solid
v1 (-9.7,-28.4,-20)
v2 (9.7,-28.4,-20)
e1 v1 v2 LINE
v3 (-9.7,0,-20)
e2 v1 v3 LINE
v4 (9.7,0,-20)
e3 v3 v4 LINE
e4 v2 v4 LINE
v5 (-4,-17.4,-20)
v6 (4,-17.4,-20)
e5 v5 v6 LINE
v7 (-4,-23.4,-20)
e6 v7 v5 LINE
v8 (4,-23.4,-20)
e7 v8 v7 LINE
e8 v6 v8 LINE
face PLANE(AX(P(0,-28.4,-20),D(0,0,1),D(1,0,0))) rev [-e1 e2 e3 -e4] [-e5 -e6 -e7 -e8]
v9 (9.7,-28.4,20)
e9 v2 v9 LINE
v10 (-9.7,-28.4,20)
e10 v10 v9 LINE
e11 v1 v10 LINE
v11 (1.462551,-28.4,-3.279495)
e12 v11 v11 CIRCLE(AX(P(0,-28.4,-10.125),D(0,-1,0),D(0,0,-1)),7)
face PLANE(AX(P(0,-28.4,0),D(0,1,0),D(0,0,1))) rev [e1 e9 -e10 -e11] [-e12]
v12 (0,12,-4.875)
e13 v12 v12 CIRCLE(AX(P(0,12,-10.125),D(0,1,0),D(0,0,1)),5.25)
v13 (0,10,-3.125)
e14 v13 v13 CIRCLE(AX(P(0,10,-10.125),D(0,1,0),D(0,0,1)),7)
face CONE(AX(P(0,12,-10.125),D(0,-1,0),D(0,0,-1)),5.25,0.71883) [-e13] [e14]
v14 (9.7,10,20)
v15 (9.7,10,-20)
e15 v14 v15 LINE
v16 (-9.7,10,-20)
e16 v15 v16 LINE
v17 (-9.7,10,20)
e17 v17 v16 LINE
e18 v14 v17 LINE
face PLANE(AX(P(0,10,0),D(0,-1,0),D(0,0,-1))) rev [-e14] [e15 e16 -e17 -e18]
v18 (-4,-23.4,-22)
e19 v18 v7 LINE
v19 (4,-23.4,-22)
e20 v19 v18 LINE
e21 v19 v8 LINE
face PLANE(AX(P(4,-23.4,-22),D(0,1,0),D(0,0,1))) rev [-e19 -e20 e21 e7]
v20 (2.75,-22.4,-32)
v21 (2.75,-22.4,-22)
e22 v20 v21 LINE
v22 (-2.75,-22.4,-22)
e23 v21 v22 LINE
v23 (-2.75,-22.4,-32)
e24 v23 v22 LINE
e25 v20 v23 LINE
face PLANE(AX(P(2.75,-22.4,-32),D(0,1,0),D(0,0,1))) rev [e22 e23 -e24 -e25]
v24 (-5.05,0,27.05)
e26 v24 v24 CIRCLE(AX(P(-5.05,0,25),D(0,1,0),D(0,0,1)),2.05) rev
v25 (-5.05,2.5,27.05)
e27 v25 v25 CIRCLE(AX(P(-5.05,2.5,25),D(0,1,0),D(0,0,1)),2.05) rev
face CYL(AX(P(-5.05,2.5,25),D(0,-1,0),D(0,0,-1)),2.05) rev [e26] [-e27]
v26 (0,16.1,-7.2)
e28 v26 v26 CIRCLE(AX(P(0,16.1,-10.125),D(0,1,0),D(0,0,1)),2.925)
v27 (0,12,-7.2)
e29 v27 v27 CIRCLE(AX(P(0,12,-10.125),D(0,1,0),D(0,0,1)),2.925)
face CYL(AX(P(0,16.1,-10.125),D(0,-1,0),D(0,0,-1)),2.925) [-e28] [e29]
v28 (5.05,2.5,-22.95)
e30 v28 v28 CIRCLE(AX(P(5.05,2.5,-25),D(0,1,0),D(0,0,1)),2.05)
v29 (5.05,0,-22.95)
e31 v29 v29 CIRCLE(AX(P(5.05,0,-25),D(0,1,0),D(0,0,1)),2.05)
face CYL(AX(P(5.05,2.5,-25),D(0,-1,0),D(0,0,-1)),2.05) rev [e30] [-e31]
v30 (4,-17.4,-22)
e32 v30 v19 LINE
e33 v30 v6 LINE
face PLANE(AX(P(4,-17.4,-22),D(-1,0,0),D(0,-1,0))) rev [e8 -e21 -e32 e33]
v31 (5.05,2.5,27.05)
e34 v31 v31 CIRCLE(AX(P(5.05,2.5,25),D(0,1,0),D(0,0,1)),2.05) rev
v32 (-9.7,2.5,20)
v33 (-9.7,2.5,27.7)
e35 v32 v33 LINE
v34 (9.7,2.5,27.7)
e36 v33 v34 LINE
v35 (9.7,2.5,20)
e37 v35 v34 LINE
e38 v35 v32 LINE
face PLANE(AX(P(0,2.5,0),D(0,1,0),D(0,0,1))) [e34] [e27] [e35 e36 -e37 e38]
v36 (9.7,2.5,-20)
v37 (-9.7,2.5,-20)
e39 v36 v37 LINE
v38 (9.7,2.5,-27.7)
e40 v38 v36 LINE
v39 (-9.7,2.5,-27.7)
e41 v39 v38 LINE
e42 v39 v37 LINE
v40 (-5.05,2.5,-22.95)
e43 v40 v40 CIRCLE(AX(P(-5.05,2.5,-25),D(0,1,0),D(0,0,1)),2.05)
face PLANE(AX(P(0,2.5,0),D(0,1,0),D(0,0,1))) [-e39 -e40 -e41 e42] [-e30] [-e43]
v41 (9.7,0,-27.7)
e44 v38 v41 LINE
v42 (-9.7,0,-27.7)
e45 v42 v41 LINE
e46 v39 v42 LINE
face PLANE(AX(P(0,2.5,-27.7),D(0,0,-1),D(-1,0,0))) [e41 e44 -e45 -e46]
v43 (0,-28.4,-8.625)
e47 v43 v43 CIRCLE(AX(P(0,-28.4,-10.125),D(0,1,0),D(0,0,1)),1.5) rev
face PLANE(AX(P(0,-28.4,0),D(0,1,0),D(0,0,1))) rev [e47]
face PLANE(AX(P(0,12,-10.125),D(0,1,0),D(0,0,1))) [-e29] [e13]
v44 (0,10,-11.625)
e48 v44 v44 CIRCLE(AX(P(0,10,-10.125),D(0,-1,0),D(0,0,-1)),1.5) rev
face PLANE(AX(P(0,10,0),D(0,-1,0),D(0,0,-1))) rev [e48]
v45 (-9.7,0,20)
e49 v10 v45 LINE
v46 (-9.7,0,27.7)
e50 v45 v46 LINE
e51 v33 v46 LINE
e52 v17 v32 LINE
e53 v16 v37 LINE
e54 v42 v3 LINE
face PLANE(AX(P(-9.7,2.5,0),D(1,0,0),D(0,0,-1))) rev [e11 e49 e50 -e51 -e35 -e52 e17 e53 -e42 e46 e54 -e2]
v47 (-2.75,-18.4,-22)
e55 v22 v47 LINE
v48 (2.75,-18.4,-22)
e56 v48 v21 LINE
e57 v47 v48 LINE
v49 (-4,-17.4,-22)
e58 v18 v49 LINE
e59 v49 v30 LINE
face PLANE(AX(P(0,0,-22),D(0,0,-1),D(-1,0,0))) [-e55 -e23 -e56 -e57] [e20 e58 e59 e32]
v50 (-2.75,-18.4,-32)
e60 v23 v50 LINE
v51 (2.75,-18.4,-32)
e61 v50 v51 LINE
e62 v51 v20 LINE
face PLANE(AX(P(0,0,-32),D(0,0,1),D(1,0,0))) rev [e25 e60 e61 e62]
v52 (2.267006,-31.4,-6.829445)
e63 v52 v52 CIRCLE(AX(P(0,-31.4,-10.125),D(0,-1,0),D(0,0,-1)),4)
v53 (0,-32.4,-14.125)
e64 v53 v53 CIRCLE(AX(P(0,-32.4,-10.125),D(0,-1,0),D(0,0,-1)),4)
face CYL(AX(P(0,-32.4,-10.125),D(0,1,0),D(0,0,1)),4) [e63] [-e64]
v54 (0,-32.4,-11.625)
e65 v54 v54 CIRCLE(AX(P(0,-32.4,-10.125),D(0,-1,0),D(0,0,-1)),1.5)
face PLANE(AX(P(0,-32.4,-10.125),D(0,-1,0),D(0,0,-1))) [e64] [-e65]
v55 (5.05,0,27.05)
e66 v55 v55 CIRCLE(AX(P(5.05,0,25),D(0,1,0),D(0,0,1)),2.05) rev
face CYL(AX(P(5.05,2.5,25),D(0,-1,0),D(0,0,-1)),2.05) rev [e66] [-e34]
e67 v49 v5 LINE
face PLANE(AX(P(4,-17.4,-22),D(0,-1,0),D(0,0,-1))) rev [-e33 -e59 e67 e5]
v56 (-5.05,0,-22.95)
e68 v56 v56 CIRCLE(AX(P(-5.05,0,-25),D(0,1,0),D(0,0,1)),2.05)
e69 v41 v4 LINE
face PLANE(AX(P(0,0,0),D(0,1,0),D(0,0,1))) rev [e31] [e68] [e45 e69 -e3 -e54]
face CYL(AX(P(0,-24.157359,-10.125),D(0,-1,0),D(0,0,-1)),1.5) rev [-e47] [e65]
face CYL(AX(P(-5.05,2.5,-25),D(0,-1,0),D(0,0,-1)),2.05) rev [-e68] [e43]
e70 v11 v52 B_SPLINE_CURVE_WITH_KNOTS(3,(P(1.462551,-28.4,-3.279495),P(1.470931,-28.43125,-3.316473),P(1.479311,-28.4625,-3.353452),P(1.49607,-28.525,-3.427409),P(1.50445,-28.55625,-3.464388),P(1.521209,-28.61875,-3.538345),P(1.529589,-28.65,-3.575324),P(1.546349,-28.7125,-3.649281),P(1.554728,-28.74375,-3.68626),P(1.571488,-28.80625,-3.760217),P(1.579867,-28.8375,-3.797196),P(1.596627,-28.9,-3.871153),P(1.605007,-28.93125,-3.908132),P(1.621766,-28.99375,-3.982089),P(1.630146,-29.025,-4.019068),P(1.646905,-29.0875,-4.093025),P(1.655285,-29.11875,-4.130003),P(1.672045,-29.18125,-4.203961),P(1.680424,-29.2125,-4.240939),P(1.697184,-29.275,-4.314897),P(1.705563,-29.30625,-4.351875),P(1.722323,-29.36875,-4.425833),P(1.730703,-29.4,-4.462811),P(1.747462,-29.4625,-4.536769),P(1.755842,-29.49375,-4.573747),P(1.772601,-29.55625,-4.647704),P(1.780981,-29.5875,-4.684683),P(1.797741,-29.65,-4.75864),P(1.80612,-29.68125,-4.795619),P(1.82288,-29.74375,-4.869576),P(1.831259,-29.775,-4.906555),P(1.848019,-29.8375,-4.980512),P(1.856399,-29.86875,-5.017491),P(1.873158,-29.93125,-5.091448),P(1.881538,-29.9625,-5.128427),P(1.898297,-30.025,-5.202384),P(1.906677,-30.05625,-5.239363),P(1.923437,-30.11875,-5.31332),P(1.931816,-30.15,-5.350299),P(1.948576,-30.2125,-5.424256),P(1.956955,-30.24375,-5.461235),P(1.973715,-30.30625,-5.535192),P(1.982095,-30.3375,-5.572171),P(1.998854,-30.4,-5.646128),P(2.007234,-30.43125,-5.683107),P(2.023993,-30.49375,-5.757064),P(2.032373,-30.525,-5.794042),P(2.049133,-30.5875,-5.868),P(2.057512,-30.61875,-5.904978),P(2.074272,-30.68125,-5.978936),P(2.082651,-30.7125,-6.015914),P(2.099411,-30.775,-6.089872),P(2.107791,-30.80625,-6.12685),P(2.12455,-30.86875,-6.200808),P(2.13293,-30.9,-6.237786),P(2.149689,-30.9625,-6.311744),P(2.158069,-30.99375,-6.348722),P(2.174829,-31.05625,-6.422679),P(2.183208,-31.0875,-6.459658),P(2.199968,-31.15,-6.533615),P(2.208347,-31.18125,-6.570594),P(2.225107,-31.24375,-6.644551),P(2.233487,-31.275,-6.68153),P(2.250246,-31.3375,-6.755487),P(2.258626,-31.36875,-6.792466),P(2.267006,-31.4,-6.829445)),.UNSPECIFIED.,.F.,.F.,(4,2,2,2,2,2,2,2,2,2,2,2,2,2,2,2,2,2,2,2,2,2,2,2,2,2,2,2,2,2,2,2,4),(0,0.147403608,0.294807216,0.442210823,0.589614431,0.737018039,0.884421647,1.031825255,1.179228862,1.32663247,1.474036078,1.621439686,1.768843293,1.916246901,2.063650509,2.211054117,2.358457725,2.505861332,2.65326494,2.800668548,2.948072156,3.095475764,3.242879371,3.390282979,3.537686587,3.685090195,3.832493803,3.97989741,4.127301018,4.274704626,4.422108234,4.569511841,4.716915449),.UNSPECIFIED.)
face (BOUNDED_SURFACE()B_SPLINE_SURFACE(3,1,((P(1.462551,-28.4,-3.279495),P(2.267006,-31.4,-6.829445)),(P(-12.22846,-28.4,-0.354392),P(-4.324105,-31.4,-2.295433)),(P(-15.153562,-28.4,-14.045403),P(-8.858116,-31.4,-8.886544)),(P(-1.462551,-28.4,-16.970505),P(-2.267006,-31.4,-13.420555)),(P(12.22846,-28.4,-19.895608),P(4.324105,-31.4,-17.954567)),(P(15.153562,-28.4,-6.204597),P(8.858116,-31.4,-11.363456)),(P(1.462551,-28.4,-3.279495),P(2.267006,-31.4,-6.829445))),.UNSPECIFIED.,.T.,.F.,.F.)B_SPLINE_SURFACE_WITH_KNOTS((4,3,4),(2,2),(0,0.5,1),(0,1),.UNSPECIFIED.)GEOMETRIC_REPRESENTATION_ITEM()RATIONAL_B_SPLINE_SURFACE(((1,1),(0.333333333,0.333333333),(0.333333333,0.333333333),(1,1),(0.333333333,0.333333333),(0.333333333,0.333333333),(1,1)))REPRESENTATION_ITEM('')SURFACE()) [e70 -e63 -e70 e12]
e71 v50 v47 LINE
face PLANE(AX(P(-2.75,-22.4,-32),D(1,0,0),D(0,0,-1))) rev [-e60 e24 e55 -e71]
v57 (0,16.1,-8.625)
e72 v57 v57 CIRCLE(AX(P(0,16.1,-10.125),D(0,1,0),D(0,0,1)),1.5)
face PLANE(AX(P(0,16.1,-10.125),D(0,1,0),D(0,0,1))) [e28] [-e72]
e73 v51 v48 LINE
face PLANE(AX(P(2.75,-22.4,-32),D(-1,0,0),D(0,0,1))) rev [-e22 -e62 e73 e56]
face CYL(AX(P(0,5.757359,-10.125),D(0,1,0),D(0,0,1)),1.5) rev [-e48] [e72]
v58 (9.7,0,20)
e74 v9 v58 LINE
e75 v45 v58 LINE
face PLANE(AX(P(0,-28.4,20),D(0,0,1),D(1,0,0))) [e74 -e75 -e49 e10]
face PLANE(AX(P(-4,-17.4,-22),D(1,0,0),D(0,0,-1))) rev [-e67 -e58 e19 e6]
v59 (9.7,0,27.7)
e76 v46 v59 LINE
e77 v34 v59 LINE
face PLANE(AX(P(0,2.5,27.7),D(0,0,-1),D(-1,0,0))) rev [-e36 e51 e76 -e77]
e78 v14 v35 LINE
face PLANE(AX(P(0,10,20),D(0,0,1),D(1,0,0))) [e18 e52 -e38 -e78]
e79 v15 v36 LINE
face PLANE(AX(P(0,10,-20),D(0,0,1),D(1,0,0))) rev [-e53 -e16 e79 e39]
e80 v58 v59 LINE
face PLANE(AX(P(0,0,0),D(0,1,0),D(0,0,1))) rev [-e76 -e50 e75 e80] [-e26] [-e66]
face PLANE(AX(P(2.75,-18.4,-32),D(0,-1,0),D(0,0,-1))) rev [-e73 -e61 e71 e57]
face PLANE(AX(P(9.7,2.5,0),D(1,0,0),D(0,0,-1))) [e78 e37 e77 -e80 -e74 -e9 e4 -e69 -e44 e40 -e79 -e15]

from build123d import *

# Parameters (mm, degrees)
SKETCH_1_W          = 19.4
SKETCH_1_H          = 7.7
SKETCH_1_R          = 2.05
SKETCH_1_H_2        = 40
EXTRUDE_1_DEPTH     = 2.5
SKETCH_1_3_W        = 19.4
SKETCH_1_3_H        = 40
EXTRUDE_2_DEPTH     = 28.4
EXTRUDE_START       = 2.5
SKETCH_1_4_W        = 19.4
SKETCH_1_4_H        = 40
EXTRUDE_3_DEPTH     = 7.5
SKETCH_2_R          = 2.925
EXTRUDE_4_DEPTH     = 6.1
SKETCH_4_2_R        = 4
EXTRUDE_5_DEPTH     = 1
SKETCH_6_R          = 7
SKETCH_7_R          = 5.25
SKETCH_8_R          = 1.5
CUT_EXTRUDE_1_DEPTH = 6.1
CUT_EXTRUDE_START   = -4
SKETCH_9_R          = 1.5
CUT_EXTRUDE_2_DEPTH = 4
SKETCH_10_W         = 8
SKETCH_10_H         = 6
EXTRUDE_6_DEPTH     = 2
SKETCH_11_W         = 5.5
SKETCH_11_H         = 4
EXTRUDE_7_DEPTH     = 10


with BuildPart() as part:
    # 스케치1 → 보스-돌출1 (new body)
    # profile 1 of 3: a face of its own
    with BuildSketch(Plane(origin=(0, 0, 0), x_dir=(1, 0, 0), z_dir=(0, 1, 0))):
        with Locations((0, 23.85)):
            Rectangle(SKETCH_1_W, SKETCH_1_H)
        with Locations(Location((-5.05, 25, 0), (0, 0, 270))):
            Circle(SKETCH_1_R, mode=Mode.SUBTRACT)
        with Locations(Location((5.05, 25, 0), (0, 0, 270))):
            Circle(SKETCH_1_R, mode=Mode.SUBTRACT)
    # profile 2 of 3: a face of its own
    with BuildSketch(Plane(origin=(0, 0, 0), x_dir=(1, 0, 0), z_dir=(0, 1, 0))):
        Rectangle(SKETCH_1_W, SKETCH_1_H_2)
    # profile 3 of 3: a face of its own
    with BuildSketch(Plane(origin=(0, 0, 0), x_dir=(1, 0, 0), z_dir=(0, 1, 0))):
        with Locations((0, -23.85)):
            Rectangle(SKETCH_1_W, SKETCH_1_H)
        with Locations(Location((-5.05, -25, 0), (0, 0, 270))):
            Circle(SKETCH_1_R, mode=Mode.SUBTRACT)
        with Locations(Location((5.05, -25, 0), (0, 0, 270))):
            Circle(SKETCH_1_R, mode=Mode.SUBTRACT)
    extrude(amount=EXTRUDE_1_DEPTH)

    # 스케치1<3> → 보스-돌출2 (add)
    with BuildSketch(Plane(origin=(0, 0, 0), x_dir=(1, 0, 0), z_dir=(0, 1, 0))):
        Rectangle(SKETCH_1_3_W, SKETCH_1_3_H)
    extrude(amount=-EXTRUDE_2_DEPTH)

    # 스케치1<4> → 보스-돌출3 (add)
    with BuildSketch(Plane(origin=(0, 0, 0), x_dir=(1, 0, 0), z_dir=(0, 1, 0)).offset(EXTRUDE_START)):
        Rectangle(SKETCH_1_4_W, SKETCH_1_4_H)
    extrude(amount=EXTRUDE_3_DEPTH)

    # 스케치2 → 보스-돌출4 (add)
    with BuildSketch(Plane(origin=(0, 10, 0), x_dir=(1, 0, 0), z_dir=(0, 1, 0))):
        with Locations(Location((0, 10.125, 0), (0, 0, 90))):
            Circle(SKETCH_2_R)
    extrude(amount=EXTRUDE_4_DEPTH)

    # 로프트1: read off the stored shape, not the designer's step
    # 로프트1: loft between two sections, ruled curve by curve
    loft_1_from = [
        Edge.make_bspline([(1.462551233, -28.4, -3.279494621), (-12.228459525, -28.4, -0.354392156), (-15.15356199, -28.4, -14.045402913), (-1.462551233, -28.4, -16.970505379), (12.228459525, -28.4, -19.895607844), (15.15356199, -28.4, -6.204597087), (1.462551233, -28.4, -3.279494621)], [0, 0, 0, 0, 0.5, 0.5, 0.5, 1, 1, 1, 1], 3, [1, 0.333333333, 0.333333333, 1, 0.333333333, 0.333333333, 1]),
    ]
    loft_1_to = [
        Edge.make_bspline([(2.267005586, -31.4, -6.829444557), (-4.3241053, -31.4, -2.295433386), (-8.858116471, -31.4, -8.886544271), (-2.267005586, -31.4, -13.420555443), (4.3241053, -31.4, -17.954566614), (8.858116471, -31.4, -11.363455729), (2.267005586, -31.4, -6.829444557)], [0, 0, 0, 0, 0.5, 0.5, 0.5, 1, 1, 1, 1], 3, [1, 0.333333333, 0.333333333, 1, 0.333333333, 0.333333333, 1]),
    ]
    loft_1 = Solid(Shell([*[Face.make_surface_from_curves(loft_1_from[k], loft_1_to[k]) for k in range(1)], Face(Wire(loft_1_from)), Face(Wire(loft_1_to))]))
    add(loft_1)

    # 스케치4<2> → 보스-돌출5 (add)
    with BuildSketch(Plane(origin=(0, -31.4, 0), x_dir=(-1, 0, 0), z_dir=(0, -1, 0))):
        with Locations(Location((0, 10.125, 0), (0, 0, 235.476))):
            Circle(SKETCH_4_2_R)
    extrude(amount=EXTRUDE_5_DEPTH)

    # 스케치6 → 로프트2 section 0
    with BuildSketch(Plane(origin=(0, 10, 0), x_dir=(1, 0, 0), z_dir=(0, 1, 0))):
        with Locations((0, 10.125)):
            Circle(SKETCH_6_R)
    # 스케치7 → 로프트2 section 1
    with BuildSketch(Plane(origin=(0, 12, 0), x_dir=(1, 0, 0), z_dir=(0, 1, 0))):
        with Locations((0, 10.125)):
            Circle(SKETCH_7_R)
    loft()

    # 스케치8 → 컷-돌출1 (cut)
    with BuildSketch(Plane(origin=(0, 16.1, 0), x_dir=(1, 0, 0), z_dir=(0, 1, 0))):
        with Locations(Location((0, 10.125, 0), (0, 0, 270))):
            Circle(SKETCH_8_R)
    extrude(amount=-CUT_EXTRUDE_1_DEPTH, mode=Mode.SUBTRACT)

    # 스케치9 → 컷-돌출2 (cut)
    with BuildSketch(Plane.XZ.offset(32.4).offset(CUT_EXTRUDE_START)):
        with Locations(Location((0, -10.125, 0), (0, 0, 90))):
            Circle(SKETCH_9_R)
    extrude(amount=CUT_EXTRUDE_2_DEPTH, mode=Mode.SUBTRACT)

    # 스케치10 → 보스-돌출6 (add)
    with BuildSketch(Plane(origin=(0, 0, -20), x_dir=(-1, 0, 0), z_dir=(0, 0, -1))):
        with Locations((0, -20.4)):
            Rectangle(SKETCH_10_W, SKETCH_10_H)
    extrude(amount=EXTRUDE_6_DEPTH)

    # 스케치11 → 보스-돌출7 (add)
    with BuildSketch(Plane(origin=(0, 0, -22), x_dir=(-1, 0, 0), z_dir=(0, 0, -1))):
        with Locations((0, -20.4)):
            Rectangle(SKETCH_11_W, SKETCH_11_H)
    extrude(amount=EXTRUDE_7_DEPTH)


solid = part.part
